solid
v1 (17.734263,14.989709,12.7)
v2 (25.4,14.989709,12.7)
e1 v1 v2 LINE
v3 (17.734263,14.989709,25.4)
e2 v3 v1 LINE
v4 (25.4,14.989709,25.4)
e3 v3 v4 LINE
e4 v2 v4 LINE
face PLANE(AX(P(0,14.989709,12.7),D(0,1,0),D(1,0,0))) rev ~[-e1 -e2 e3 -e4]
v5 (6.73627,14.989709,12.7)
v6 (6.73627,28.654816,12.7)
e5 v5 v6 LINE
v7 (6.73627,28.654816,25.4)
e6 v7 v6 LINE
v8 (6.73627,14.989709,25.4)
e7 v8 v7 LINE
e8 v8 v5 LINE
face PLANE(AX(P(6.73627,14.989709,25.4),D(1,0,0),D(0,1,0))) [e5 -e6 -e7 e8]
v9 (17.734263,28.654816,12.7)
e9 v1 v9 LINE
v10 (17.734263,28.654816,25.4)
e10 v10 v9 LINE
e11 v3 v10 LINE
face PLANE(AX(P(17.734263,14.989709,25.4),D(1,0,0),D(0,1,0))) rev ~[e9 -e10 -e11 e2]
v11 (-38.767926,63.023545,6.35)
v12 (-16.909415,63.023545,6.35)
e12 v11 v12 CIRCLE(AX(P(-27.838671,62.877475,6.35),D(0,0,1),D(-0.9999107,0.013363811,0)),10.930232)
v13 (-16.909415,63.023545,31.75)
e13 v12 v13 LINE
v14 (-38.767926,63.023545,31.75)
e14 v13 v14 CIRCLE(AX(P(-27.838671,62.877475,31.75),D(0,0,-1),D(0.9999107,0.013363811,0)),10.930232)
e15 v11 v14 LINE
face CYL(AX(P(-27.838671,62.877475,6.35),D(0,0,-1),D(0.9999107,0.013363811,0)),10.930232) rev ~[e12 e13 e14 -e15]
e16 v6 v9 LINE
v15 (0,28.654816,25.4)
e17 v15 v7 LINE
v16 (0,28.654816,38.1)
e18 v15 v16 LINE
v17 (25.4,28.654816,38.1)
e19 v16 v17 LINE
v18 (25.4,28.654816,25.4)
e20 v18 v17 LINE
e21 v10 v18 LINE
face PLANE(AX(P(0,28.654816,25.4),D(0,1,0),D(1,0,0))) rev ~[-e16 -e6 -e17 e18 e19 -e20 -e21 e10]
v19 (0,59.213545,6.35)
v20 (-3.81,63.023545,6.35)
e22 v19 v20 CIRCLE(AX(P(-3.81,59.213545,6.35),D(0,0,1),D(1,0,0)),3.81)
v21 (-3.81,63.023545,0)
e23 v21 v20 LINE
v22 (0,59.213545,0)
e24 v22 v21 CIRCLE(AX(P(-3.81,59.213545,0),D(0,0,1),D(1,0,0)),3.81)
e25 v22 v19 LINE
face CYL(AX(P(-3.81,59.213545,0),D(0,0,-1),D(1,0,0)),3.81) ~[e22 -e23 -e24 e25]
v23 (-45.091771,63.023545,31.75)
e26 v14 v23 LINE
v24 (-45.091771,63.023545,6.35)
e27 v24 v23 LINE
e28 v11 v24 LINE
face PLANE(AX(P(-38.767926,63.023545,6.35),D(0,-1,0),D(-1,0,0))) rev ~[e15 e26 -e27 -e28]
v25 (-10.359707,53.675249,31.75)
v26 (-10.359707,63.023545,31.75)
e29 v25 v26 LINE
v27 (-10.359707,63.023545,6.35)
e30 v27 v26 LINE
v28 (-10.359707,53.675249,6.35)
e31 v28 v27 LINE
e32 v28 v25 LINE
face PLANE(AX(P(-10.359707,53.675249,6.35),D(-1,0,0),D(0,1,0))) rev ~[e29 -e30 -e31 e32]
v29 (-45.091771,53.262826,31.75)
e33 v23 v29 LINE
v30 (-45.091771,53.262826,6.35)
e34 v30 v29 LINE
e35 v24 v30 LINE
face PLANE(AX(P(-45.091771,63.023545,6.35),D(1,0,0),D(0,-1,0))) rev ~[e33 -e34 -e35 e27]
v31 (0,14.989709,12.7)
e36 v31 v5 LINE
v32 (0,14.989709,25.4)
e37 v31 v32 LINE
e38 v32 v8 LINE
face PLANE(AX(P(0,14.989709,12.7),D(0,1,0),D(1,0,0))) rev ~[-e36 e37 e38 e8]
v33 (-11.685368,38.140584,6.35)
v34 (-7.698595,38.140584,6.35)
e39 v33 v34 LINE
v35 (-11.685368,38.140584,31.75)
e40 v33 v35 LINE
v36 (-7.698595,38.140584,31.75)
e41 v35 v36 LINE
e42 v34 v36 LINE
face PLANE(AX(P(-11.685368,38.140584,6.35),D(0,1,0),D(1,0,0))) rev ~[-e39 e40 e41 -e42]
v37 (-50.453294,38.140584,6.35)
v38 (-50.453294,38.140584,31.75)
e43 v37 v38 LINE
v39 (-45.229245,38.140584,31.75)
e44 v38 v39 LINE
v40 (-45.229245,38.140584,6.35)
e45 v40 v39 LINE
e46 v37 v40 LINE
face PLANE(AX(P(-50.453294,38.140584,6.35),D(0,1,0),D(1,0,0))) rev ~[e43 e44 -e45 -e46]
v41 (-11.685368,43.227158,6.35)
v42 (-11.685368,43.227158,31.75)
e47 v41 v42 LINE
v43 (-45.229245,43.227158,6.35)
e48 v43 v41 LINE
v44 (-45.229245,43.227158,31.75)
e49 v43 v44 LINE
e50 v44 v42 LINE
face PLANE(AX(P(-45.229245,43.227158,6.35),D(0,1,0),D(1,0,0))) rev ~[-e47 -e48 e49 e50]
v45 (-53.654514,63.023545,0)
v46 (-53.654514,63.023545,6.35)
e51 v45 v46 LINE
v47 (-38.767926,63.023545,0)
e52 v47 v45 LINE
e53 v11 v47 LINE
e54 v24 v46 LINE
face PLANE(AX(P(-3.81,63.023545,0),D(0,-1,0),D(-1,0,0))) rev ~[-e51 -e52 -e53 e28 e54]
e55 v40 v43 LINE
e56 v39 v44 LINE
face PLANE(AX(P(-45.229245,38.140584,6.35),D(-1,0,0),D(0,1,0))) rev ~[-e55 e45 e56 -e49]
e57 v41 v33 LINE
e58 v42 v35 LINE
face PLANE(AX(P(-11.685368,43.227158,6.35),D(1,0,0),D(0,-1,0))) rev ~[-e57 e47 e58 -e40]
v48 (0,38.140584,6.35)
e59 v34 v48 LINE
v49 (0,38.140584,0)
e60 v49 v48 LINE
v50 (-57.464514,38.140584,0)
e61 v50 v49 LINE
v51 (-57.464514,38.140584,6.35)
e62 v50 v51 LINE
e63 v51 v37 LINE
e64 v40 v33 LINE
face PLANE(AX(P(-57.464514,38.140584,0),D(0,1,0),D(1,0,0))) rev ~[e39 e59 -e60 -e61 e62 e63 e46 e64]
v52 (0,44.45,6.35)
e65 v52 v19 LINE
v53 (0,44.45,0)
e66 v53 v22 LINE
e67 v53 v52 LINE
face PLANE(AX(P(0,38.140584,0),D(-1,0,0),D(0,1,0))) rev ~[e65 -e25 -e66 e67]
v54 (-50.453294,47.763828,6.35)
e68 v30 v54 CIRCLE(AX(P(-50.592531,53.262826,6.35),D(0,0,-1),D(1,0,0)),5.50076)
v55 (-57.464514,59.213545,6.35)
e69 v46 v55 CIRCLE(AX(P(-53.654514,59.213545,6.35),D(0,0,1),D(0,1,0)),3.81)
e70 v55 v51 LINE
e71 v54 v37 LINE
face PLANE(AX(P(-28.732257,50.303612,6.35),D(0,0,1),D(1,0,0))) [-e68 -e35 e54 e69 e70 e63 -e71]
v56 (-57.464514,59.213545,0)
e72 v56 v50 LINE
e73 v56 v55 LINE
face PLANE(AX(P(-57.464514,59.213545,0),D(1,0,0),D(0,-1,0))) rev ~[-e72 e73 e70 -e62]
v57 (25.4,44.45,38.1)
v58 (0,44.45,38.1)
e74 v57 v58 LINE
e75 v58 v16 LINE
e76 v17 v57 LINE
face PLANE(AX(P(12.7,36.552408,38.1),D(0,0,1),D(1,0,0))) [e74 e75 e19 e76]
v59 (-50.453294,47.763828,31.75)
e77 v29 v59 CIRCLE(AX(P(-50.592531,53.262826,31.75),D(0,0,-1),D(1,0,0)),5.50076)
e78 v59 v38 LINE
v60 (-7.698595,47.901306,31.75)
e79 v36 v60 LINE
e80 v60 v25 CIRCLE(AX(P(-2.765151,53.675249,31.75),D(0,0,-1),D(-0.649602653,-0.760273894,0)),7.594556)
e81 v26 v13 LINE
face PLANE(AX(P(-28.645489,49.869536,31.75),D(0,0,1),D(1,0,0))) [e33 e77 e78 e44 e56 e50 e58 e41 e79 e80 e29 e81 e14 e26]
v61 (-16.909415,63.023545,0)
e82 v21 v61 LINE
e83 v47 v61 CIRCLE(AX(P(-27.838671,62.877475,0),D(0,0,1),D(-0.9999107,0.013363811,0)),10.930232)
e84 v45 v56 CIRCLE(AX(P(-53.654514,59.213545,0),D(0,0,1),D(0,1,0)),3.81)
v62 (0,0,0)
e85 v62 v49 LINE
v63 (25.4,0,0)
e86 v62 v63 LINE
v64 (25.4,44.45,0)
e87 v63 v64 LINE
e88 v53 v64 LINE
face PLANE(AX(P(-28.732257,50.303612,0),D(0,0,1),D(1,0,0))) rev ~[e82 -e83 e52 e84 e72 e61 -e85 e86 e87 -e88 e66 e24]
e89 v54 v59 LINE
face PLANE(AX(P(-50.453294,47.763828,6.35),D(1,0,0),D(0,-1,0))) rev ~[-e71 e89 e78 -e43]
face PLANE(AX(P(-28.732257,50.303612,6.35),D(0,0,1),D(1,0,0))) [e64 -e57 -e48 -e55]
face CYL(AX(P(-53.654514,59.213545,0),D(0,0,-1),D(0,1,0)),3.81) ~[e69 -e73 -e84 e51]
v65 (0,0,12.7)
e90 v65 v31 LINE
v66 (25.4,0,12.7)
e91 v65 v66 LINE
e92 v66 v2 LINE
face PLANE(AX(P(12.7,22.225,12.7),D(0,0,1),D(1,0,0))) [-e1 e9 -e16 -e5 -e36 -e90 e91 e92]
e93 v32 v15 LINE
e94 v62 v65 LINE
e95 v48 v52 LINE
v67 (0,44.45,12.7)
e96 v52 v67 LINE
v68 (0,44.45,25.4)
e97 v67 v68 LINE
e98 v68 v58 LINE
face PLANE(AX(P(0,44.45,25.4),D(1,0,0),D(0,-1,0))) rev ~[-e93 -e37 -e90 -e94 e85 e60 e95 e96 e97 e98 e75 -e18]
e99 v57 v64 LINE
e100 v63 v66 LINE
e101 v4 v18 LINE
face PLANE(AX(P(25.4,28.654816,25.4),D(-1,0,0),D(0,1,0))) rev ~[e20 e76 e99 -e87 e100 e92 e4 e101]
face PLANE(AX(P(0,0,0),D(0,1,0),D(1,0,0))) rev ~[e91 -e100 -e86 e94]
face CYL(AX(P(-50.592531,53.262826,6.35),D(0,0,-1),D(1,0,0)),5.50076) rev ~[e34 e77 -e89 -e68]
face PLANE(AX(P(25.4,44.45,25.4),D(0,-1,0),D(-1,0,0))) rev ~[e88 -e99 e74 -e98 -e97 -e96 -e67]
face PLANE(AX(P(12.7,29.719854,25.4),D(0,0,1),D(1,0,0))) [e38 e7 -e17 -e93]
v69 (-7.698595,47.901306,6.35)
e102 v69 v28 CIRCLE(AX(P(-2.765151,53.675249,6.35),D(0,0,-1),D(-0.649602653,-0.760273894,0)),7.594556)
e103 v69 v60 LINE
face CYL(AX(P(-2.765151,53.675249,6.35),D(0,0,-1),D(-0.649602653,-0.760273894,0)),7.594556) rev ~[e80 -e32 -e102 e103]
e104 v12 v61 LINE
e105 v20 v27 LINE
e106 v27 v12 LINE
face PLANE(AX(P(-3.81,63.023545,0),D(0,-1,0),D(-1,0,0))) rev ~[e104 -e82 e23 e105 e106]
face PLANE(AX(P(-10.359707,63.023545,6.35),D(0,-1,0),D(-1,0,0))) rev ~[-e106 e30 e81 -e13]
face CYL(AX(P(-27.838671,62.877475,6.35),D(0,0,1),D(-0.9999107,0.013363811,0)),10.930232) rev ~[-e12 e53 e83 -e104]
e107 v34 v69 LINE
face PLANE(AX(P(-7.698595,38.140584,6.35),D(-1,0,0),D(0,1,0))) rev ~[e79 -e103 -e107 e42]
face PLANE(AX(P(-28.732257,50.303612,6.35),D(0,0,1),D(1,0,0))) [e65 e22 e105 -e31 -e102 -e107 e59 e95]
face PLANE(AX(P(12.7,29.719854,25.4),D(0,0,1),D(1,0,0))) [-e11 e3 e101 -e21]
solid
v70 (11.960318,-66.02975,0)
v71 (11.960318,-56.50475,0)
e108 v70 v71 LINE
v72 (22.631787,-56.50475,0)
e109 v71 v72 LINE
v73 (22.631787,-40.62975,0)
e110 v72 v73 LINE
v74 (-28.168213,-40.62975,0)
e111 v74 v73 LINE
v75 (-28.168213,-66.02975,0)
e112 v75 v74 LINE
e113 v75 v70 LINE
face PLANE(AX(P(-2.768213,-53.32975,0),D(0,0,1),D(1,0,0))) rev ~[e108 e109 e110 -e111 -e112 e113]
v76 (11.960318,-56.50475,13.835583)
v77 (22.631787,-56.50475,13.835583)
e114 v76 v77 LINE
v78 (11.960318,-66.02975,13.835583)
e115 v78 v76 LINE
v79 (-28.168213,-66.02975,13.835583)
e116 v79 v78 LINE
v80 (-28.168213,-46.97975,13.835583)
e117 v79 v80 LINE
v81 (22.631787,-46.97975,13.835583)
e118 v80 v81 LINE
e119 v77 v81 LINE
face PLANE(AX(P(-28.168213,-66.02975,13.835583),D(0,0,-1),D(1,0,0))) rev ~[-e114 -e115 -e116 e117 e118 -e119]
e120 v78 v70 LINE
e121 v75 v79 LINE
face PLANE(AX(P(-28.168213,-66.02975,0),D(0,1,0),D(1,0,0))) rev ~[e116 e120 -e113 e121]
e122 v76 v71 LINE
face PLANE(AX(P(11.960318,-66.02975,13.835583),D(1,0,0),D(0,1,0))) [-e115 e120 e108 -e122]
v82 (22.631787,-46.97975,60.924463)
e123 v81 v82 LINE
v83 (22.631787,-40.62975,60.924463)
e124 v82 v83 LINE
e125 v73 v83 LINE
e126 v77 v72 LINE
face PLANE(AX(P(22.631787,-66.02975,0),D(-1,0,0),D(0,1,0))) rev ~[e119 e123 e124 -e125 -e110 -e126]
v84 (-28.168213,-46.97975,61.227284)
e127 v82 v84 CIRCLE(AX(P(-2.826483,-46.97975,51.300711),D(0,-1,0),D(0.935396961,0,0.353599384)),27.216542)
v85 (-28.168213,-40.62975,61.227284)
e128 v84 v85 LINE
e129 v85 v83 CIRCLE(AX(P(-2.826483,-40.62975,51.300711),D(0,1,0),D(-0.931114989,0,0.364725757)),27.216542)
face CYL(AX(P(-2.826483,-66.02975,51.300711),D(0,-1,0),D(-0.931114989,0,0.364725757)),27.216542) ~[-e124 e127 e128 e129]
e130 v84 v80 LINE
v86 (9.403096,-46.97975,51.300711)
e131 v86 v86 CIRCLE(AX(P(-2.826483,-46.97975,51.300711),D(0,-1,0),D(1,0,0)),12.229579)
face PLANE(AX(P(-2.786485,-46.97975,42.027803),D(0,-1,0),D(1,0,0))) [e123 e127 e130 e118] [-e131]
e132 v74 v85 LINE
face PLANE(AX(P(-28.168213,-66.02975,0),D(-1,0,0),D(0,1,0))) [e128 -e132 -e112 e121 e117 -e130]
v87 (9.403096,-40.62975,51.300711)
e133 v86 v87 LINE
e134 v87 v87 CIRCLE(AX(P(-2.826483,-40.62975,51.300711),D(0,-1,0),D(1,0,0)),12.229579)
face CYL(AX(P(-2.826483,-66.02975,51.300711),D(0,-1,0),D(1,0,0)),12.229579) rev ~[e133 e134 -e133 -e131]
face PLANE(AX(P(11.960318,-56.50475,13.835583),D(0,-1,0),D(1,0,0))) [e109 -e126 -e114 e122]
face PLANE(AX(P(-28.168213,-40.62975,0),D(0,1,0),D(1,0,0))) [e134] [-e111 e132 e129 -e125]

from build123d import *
from build123d import SkipClean  # not in build123d's __all__

# Parameters (mm, degrees)
F0_W      = 25.4
F0_H      = 44.45
F1_DEPTH  = 12.7
F2_W      = 25.4
F2_H      = 29.4602914497
F3_DEPTH  = 12.7
F4_W      = 10.9979929402
F4_H      = 13.6651070789
F5_DEPTH  = 12.7
F7_DEPTH  = 12.7
F8_W      = 50.8
F8_H      = 25.4
F9_DEPTH  = 101.6
F11_DEPTH = 25.4
F12_R     = 12.2295787835
F13_DEPTH = 25.4
F14_R     = 12.2295787835
F15_DEPTH = 19.05
F16_W     = 10.6714690655
F16_H     = 9.525
F17_DEPTH = 25.4
F19_DEPTH = 6.35
F21_DEPTH = 25.4
F23_DEPTH = 25.4


with BuildPart() as f1:
    # F0 (on Top) → F1 (new body)
    with BuildSketch(Plane.XY):
        with Locations((12.7, 22.225)):
            Rectangle(F0_W, F0_H)
    extrude(amount=F1_DEPTH)

    # F2 (on face) → F3 (join)
    with BuildSketch(Plane.XY.offset(12.7)):
        with Locations((12.7, 29.7198542751)):
            Rectangle(F2_W, F2_H)
    extrude(amount=F3_DEPTH)

    # F4 (on face) → F5 (cut)
    with BuildSketch(Plane.XY.offset(25.4)):
        with Locations((12.2352666222, 21.8222620897)):
            Rectangle(F4_W, F4_H)
    extrude(amount=-F5_DEPTH, mode=Mode.SUBTRACT)

    # F6 (on face) → F7 (join)
    with BuildSketch(Plane.XY.offset(25.4)):
        Polygon((25.4, 44.45), (0, 44.45), (0, 28.6548156291), (6.736270152, 28.6548156291), (17.7342630923, 28.6548156291), (25.4, 28.6548156291), align=None)
    extrude(amount=F7_DEPTH)

    # F18 (on Top) → F19 (join)
    with BuildSketch(Plane.XY):
        with BuildLine():
            Line((-3.81, 63.023544848), (-53.6545139277, 63.023544848))
            ThreePointArc((-53.6545139277, 63.023544848), (-56.348590764, 61.9076216843), (-57.4645139277, 59.213544848))
            Line((-57.4645139277, 59.213544848), (-57.4645139277, 38.1405837834))
            Line((-57.4645139277, 38.1405837834), (0, 38.1405837834))
            Line((0, 38.1405837834), (0, 59.213544848))
            ThreePointArc((0, 59.213544848), (-1.1159231637, 61.9076216843), (-3.81, 63.023544848))
        make_face()
    extrude(amount=F19_DEPTH)

    # F20 (on face) → F21 (cut)
    with BuildSketch(Plane.XY.offset(6.35)):
        with BuildLine():
            Line((-16.9094149023, 63.023544848), (-38.7679263949, 63.023544848))
            ThreePointArc((-38.7679263949, 63.023544848), (-27.8386706486, 51.9472434828), (-16.9094149023, 63.023544848))
        make_face()
    extrude(amount=-F21_DEPTH, mode=Mode.SUBTRACT)

    # F22 (on face) → F23 (join)
    with BuildSketch(Plane.XY.offset(6.35)):
        with BuildLine():
            Line((-45.2292449772, 38.1405837834), (-45.2292449772, 43.2271584868))
            Line((-45.2292449772, 43.2271584868), (-11.6853676736, 43.2271584868))
            Line((-11.6853676736, 43.2271584868), (-11.6853676736, 38.1405837834))
            Line((-11.6853676736, 38.1405837834), (-7.6985950582, 38.1405837834))
            Line((-7.6985950582, 38.1405837834), (-7.6985950582, 47.9013063014))
            ThreePointArc((-7.6985950582, 47.9013063014), (-9.6624188313, 50.4964154712), (-10.3597074512, 53.6752492189))
            Line((-10.3597074512, 53.6752492189), (-10.3597074512, 63.023544848))
            Line((-10.3597074512, 63.023544848), (-16.9094149023, 63.023544848))
            ThreePointArc((-16.9094149023, 63.023544848), (-27.8386706486, 51.9472434828), (-38.7679263949, 63.023544848))
            Line((-38.7679263949, 63.023544848), (-45.0917705894, 63.023544848))
            Line((-45.0917705894, 63.023544848), (-45.0917705894, 53.2628260553))
            ThreePointArc((-45.0917705894, 53.2628260553), (-46.6539859613, 49.4227442996), (-50.4532940686, 47.7638281882))
            Line((-50.4532940686, 47.7638281882), (-50.4532940686, 38.1405837834))
            Line((-50.4532940686, 38.1405837834), (-45.2292449772, 38.1405837834))
        make_face()
    with SkipClean():  # cleaning this boolean's faces spoils the solid; the shape is the same uncleaned
        extrude(amount=F23_DEPTH)


with BuildPart() as f9:
    # F8 (on Top) → F9 (new body)
    with BuildSketch(Plane.XY):
        with Locations((-2.7682126224, -53.3297498107)):
            Rectangle(F8_W, F8_H)
    extrude(amount=F9_DEPTH)

    # F10 (on face) → F11 (cut)
    with BuildSketch(Plane.XZ.offset(66.0297498107)):
        with BuildLine():
            ThreePointArc((-28.1682126224, 61.2272843719), (-2.6642465557, 78.5167686352), (22.6317873776, 60.9244629741))
            Line((22.6317873776, 60.9244629741), (22.6317873776, 101.6))
            Line((22.6317873776, 101.6), (-28.1682126224, 101.6))
            Line((-28.1682126224, 101.6), (-28.1682126224, 61.2272843719))
        make_face()
    extrude(amount=-F11_DEPTH, mode=Mode.SUBTRACT)

    # F12 (on face) → F13 (cut)
    with BuildSketch(Plane.XZ.offset(66.0297498107)):
        with Locations((-2.826482869, 51.3007106537)):
            Circle(F12_R)
    extrude(amount=-F13_DEPTH, mode=Mode.SUBTRACT)

    # F14 (on face) → F15 (cut)
    with BuildSketch(Plane.XZ.offset(66.0297498107)):
        with BuildLine():
            Line((-28.1682126224, 61.2272843719), (-28.1682126224, 13.8355828822))
            Line((-28.1682126224, 13.8355828822), (22.6317873776, 13.8355828822))
            Line((22.6317873776, 13.8355828822), (22.6317873776, 60.9244629741))
            ThreePointArc((22.6317873776, 60.9244629741), (-2.6642465557, 78.5167686352), (-28.1682126224, 61.2272843719))
        make_face()
        with Locations((-2.826482869, 51.3007106537)):
            Circle(F14_R, mode=Mode.SUBTRACT)
    extrude(amount=-F15_DEPTH, mode=Mode.SUBTRACT)

    # F16 (on face) → F17 (cut)
    with BuildSketch(Plane.XY.offset(13.8355828822)):
        with Locations((17.2960528448, -61.2672498107)):
            Rectangle(F16_W, F16_H)
    extrude(amount=-F17_DEPTH, mode=Mode.SUBTRACT)


solid = Compound([f1.part, f9.part])
